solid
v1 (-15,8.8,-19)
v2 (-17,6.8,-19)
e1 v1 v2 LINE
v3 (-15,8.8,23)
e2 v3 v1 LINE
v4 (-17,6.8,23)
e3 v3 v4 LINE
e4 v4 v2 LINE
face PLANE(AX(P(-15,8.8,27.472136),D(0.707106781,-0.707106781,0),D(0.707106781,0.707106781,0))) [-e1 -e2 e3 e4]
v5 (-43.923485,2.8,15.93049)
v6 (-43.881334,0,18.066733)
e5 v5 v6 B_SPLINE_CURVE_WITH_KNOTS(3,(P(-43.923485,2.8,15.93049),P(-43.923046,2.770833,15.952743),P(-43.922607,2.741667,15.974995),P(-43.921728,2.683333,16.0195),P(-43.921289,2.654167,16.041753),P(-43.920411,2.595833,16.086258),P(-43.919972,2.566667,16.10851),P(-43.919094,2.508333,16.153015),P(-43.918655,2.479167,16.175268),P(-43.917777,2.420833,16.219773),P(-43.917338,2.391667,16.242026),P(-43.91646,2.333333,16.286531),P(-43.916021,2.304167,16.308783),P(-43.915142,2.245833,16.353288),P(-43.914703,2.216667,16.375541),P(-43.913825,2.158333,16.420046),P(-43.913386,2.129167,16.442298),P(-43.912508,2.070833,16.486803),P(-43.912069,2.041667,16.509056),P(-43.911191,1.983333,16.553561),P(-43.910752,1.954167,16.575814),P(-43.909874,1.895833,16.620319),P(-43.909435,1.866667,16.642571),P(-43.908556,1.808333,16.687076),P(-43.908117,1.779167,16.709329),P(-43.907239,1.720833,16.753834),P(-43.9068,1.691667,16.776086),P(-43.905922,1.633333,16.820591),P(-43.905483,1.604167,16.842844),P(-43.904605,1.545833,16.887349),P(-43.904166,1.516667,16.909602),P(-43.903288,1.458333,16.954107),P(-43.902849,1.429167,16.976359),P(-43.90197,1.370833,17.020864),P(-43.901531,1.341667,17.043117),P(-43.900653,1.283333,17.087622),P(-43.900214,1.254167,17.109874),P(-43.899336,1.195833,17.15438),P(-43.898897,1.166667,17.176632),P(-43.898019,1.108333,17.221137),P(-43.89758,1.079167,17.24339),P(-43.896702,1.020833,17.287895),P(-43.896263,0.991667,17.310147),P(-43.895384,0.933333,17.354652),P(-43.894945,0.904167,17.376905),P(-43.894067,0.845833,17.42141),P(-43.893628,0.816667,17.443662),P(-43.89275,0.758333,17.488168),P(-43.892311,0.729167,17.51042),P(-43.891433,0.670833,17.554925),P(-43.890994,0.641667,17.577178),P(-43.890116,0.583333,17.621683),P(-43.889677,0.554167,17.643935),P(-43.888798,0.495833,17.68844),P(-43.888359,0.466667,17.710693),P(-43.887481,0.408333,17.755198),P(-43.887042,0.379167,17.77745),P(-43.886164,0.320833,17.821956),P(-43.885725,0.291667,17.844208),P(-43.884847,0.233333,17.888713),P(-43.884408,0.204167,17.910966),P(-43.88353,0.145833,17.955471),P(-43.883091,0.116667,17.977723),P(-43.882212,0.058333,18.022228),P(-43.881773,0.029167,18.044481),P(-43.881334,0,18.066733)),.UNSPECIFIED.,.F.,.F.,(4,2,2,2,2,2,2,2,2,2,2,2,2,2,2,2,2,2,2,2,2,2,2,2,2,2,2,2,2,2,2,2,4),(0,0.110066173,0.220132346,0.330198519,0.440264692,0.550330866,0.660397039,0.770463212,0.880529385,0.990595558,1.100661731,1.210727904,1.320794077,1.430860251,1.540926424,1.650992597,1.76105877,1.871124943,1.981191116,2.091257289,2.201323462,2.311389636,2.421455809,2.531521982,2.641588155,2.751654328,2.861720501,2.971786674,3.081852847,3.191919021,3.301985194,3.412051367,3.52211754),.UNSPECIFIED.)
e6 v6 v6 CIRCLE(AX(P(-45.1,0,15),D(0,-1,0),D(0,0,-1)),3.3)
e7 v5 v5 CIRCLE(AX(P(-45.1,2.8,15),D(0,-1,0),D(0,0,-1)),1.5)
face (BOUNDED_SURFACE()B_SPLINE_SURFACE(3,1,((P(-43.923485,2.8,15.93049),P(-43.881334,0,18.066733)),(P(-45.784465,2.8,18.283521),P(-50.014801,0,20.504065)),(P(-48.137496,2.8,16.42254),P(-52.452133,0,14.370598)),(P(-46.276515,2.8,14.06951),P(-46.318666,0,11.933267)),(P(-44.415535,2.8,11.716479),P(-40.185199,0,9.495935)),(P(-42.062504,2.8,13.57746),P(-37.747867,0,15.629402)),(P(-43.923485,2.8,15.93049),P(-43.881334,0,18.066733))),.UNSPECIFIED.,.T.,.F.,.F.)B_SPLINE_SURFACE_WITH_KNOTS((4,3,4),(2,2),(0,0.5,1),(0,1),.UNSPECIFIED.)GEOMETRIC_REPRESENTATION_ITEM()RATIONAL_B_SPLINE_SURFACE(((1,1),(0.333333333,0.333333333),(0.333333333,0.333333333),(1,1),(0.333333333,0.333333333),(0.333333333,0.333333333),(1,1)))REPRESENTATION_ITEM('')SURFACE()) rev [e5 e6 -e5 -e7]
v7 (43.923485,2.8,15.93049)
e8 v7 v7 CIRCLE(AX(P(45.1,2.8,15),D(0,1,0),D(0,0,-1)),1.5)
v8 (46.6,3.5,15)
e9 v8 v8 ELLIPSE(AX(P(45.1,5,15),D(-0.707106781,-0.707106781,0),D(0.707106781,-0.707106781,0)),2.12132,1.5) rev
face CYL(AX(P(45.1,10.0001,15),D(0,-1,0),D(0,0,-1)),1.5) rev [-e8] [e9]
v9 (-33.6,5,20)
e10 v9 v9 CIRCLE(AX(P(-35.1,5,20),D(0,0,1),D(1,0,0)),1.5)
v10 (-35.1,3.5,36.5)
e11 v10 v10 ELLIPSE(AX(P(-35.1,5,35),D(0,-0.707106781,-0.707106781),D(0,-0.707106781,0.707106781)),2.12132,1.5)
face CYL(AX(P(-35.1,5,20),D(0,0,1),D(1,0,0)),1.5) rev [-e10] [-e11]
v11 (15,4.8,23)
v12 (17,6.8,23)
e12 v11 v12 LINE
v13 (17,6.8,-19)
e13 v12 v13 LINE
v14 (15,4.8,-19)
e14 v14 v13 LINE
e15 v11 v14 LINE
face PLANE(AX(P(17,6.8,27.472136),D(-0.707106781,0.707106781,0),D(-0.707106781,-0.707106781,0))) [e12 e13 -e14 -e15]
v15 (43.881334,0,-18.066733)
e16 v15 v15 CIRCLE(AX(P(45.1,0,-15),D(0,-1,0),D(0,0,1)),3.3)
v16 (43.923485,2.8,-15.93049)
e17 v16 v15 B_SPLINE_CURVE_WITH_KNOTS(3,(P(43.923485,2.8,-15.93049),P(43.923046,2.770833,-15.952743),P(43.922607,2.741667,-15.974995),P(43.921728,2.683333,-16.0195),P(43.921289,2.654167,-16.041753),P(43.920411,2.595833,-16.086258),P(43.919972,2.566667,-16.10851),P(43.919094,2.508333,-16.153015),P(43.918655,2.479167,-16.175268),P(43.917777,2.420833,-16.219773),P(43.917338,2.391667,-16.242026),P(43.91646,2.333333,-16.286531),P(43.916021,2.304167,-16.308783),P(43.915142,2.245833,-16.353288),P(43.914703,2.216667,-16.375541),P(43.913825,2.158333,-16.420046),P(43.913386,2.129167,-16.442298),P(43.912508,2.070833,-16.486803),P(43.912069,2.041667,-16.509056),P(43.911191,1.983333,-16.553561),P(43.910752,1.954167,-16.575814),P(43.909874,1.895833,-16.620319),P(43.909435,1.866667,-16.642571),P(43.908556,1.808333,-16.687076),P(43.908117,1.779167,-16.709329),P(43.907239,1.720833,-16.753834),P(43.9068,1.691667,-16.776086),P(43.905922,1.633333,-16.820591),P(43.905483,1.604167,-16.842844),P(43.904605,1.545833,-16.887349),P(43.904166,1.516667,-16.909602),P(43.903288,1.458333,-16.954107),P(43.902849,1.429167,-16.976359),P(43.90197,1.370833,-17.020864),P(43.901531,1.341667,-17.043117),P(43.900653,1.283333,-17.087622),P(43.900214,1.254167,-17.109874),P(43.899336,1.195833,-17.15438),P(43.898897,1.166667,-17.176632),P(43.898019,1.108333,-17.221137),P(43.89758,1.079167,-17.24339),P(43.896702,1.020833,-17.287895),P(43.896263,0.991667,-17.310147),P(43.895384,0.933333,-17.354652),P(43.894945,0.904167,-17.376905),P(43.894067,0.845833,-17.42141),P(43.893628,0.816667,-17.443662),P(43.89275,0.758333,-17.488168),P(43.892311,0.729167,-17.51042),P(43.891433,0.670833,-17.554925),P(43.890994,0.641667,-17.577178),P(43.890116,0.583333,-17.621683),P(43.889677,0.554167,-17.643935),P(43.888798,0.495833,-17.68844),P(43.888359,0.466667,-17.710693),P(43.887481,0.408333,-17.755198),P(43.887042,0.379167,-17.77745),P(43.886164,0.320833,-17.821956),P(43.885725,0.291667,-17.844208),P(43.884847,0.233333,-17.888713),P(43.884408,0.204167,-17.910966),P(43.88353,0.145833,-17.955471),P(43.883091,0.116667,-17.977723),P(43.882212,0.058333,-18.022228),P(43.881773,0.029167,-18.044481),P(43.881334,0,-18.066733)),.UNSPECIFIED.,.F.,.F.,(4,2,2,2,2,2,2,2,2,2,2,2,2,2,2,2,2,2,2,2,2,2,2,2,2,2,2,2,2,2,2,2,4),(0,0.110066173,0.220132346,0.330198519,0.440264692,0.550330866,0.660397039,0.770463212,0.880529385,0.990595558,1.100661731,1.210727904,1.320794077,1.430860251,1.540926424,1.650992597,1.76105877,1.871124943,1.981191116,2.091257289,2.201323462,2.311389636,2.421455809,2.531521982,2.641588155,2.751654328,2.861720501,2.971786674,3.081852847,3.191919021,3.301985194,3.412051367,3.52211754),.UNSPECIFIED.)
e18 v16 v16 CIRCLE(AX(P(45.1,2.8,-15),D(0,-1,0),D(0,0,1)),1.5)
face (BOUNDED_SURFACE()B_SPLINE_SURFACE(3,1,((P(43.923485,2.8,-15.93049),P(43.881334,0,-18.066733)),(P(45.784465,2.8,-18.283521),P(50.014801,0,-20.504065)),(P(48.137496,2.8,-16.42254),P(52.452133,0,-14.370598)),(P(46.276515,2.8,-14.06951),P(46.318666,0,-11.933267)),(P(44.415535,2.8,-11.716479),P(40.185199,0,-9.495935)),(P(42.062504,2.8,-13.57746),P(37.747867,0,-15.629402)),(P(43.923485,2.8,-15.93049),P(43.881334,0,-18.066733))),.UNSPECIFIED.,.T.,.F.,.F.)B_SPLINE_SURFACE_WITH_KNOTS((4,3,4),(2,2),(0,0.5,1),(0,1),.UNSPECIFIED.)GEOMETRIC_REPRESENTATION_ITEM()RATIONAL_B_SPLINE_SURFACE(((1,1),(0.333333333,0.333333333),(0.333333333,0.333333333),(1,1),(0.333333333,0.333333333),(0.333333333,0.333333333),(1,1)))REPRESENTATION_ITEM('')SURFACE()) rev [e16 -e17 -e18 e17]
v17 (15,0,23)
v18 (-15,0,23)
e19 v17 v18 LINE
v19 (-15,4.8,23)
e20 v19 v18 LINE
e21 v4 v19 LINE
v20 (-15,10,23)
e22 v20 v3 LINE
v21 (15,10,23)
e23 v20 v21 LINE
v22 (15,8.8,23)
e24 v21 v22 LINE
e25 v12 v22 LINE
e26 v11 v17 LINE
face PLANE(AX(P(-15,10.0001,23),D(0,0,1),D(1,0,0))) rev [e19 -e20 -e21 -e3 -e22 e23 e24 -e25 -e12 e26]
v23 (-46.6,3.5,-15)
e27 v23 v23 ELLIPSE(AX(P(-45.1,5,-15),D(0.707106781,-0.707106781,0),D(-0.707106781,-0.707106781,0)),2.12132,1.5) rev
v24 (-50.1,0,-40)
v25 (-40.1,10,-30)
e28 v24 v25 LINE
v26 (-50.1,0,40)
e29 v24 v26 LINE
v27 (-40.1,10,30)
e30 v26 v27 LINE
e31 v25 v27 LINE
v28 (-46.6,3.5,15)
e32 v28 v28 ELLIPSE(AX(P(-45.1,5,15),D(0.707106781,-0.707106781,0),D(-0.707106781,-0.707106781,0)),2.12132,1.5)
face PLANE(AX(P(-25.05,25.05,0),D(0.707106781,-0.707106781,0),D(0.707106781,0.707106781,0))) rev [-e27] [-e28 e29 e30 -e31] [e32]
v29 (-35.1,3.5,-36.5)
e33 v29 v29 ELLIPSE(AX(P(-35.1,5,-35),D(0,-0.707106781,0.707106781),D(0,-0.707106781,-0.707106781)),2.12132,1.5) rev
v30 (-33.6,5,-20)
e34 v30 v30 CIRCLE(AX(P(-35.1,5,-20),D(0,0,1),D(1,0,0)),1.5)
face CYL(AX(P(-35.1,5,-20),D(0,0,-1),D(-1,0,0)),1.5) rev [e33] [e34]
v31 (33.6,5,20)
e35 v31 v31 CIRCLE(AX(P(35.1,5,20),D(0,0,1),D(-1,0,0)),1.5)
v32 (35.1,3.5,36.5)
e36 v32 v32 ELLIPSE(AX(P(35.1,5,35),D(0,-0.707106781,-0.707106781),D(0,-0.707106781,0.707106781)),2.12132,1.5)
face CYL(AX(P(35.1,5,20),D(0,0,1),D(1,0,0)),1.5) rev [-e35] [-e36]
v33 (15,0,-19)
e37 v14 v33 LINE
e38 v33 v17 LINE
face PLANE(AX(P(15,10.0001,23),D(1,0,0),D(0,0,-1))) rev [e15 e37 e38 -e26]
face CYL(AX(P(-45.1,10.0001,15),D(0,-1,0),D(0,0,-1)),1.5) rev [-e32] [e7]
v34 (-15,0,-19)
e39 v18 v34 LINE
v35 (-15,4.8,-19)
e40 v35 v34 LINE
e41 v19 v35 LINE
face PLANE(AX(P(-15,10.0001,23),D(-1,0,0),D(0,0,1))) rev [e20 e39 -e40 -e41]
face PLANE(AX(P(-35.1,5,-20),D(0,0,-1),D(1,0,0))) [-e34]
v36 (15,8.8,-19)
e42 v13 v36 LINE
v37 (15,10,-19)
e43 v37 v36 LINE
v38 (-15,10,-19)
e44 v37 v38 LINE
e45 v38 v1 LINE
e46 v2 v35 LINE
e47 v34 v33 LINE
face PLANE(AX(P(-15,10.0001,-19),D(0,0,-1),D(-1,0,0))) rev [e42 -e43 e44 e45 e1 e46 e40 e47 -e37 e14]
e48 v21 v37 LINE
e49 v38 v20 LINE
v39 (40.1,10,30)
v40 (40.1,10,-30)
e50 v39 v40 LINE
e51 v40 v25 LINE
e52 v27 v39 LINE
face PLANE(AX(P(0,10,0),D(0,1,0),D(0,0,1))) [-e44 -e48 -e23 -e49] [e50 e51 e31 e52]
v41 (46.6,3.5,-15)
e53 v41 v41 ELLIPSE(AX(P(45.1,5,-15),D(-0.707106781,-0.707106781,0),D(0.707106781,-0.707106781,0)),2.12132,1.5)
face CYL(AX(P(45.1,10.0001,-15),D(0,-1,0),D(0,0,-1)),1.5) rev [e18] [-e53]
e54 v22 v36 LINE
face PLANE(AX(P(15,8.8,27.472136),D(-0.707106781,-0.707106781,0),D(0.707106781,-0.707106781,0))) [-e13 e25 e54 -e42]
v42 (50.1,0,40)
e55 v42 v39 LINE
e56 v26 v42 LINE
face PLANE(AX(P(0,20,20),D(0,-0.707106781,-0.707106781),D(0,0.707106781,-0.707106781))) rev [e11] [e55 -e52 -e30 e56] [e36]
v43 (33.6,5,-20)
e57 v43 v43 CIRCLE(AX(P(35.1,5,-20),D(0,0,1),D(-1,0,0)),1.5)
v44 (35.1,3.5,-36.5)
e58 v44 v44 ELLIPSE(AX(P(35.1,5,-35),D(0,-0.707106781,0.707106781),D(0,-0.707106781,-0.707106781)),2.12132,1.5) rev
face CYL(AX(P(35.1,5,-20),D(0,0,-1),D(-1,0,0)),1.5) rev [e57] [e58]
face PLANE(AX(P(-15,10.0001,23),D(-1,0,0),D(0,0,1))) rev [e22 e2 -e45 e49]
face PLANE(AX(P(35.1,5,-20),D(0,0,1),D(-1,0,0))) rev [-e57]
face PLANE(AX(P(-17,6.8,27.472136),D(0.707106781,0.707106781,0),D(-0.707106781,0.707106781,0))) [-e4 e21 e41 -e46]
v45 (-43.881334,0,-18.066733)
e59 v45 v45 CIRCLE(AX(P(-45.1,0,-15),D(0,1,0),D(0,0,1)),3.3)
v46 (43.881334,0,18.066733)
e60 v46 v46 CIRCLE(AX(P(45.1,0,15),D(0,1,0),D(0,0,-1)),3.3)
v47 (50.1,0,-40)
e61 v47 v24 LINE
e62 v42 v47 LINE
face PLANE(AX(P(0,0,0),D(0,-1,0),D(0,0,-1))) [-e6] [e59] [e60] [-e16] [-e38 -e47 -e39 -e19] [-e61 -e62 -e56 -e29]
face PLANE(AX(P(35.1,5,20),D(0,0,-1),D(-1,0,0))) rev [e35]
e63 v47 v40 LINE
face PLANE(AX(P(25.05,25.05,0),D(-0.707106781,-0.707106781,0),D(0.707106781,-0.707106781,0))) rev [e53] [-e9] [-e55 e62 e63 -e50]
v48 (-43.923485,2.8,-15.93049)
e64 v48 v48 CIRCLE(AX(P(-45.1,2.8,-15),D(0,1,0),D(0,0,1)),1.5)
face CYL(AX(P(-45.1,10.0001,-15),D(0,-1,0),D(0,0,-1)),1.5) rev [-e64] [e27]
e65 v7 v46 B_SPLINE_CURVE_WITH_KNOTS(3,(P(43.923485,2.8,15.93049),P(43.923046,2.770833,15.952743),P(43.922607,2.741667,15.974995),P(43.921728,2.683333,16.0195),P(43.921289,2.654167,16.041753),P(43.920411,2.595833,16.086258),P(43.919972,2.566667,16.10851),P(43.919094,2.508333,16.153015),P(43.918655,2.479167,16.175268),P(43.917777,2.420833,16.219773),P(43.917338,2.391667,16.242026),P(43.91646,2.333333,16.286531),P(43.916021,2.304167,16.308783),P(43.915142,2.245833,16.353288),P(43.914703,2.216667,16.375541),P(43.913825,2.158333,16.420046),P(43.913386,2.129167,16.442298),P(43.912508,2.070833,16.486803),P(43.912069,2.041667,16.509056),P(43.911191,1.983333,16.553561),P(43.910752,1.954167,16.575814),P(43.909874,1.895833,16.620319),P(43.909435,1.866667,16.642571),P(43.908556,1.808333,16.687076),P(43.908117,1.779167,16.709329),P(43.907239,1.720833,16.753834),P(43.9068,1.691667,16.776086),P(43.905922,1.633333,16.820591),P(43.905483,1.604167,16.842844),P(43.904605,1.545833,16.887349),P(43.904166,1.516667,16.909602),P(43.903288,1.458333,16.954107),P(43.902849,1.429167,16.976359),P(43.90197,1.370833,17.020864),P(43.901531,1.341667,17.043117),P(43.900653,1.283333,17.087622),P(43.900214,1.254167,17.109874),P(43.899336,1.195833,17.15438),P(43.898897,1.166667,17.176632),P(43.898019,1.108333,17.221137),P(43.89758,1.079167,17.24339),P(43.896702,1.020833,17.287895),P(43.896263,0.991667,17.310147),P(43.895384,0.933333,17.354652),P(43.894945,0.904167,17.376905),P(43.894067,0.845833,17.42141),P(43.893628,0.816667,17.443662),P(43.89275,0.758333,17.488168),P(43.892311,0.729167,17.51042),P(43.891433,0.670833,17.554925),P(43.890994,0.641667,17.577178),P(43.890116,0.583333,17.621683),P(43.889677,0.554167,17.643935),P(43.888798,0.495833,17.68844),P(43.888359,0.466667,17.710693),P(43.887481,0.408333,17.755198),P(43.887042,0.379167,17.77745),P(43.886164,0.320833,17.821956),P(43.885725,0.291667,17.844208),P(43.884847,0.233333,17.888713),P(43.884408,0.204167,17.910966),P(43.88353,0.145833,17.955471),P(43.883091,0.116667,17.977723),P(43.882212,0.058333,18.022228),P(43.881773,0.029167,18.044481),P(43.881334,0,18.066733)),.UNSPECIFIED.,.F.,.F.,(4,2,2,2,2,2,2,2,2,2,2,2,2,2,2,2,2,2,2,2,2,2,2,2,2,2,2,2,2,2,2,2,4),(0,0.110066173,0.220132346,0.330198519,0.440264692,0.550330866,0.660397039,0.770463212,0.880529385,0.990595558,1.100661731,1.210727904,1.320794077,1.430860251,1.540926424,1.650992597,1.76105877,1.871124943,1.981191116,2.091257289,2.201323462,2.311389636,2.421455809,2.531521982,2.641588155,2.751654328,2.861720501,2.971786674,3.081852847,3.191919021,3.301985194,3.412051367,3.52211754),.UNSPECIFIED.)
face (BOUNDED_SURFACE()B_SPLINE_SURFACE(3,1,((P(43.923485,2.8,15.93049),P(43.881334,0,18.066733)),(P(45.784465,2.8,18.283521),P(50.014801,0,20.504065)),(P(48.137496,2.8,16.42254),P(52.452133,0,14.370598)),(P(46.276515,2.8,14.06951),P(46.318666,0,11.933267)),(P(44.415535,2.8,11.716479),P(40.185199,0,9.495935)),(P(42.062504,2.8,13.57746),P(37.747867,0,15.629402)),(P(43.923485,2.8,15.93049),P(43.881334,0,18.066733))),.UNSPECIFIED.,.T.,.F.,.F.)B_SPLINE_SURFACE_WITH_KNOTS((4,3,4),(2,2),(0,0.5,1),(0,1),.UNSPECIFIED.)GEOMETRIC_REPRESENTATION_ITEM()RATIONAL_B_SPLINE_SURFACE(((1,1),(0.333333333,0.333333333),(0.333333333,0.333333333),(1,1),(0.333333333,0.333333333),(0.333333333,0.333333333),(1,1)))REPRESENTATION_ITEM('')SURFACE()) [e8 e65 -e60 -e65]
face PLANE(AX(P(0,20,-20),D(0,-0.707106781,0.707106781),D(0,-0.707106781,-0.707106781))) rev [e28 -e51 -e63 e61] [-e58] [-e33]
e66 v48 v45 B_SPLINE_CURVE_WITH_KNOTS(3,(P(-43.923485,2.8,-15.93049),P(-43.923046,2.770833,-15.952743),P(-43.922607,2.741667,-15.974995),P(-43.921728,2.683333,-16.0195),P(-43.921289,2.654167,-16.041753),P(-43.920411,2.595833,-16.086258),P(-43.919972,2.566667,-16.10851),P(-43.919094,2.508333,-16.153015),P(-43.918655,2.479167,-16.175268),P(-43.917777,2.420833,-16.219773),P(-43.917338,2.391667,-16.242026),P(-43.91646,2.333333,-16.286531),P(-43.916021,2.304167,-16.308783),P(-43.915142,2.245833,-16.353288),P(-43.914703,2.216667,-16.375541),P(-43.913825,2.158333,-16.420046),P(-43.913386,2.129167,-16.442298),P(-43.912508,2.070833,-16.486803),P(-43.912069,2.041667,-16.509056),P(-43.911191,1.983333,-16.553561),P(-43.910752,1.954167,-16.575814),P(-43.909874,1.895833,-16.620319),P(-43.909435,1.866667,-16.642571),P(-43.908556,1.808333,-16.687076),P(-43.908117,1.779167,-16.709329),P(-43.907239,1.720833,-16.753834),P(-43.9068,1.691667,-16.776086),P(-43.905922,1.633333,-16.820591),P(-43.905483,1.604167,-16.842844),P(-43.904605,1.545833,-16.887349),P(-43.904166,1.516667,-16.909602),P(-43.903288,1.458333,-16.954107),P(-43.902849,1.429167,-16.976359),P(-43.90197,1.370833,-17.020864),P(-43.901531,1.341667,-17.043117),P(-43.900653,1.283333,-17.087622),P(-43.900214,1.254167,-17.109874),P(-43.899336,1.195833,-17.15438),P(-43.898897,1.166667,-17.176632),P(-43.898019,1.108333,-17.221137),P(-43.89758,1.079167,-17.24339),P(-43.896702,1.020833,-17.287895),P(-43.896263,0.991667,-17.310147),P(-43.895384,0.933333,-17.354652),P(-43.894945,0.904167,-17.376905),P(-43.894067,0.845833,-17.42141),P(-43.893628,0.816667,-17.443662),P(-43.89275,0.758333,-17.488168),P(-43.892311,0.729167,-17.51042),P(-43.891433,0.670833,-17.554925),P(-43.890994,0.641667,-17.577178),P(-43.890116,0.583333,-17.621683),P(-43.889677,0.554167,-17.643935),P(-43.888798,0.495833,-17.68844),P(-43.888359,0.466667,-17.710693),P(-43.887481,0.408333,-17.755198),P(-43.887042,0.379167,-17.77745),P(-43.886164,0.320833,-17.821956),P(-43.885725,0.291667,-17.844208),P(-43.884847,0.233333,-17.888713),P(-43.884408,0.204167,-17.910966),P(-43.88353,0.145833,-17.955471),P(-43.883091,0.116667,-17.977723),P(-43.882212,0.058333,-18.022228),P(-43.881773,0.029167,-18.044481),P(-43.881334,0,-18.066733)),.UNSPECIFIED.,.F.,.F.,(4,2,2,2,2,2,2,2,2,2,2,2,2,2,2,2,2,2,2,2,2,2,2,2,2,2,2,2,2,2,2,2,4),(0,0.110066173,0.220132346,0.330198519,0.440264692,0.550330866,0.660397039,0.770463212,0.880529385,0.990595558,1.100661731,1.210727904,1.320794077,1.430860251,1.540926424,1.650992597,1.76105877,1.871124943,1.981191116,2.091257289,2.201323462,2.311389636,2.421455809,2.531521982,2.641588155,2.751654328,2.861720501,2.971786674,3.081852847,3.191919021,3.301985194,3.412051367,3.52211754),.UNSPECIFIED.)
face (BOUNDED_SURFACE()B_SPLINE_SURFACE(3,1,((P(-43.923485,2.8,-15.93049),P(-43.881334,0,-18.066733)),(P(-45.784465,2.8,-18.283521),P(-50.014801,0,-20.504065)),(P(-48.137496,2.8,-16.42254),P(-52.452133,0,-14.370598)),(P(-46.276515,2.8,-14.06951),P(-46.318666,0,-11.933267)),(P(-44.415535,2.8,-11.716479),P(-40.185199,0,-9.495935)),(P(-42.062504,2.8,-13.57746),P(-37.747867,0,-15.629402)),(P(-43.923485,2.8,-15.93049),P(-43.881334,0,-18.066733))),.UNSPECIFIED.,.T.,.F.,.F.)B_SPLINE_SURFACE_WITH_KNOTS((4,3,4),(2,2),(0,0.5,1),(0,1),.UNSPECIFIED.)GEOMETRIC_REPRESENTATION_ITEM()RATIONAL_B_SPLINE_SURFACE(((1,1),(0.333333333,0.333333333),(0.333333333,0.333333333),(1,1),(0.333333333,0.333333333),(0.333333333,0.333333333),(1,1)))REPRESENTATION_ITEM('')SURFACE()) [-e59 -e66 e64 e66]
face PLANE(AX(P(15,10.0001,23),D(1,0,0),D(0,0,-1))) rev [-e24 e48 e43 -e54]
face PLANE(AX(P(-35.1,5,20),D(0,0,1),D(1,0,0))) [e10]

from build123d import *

# Parameters (mm, degrees)
SKETCH_4_R          = 1.5
CUT_EXTRUDE_1_DEPTH = 20
SKETCH_5_R          = 1.5
CUT_EXTRUDE_2_DEPTH = 65.884590004
SKETCH3_W           = 30
SKETCH3_H           = 42
CUT_EXTRUDE1_DEPTH  = 65.884590004
CUT_EXTRUDE2_DEPTH  = 42


with BuildPart() as part:
    # Эскиз1 → По сечениям1 section 0
    with BuildSketch(Plane(origin=(0, 0, 0), x_dir=(1, 0, 0), z_dir=(0, 1, 0))):
        with BuildLine():
            Line((-50.1, -40), (50.1, -40))
            Line((50.1, -40), (50.1, 40))
            Line((50.1, 40), (-50.1, 40))
            Line((-50.1, 40), (-50.1, -40))
        make_face()
    # Эскиз2 → По сечениям1 section 1
    with BuildSketch(Plane(origin=(0, 10, 0), x_dir=(1, 0, 0), z_dir=(0, 1, 0))):
        with BuildLine():
            Line((40.1, -30), (40.1, 30))
            Line((40.1, 30), (-40.1, 30))
            Line((-40.1, 30), (-40.1, -30))
            Line((-40.1, -30), (40.1, -30))
        make_face()
    loft()

    # Эскиз4 → Вырез-Вытянуть1 (cut)
    with BuildSketch(Plane.XY.offset(40)):
        with Locations((-35.1, 5)):
            Circle(SKETCH_4_R)
        with Locations(Location((35.1, 5, 0), (0, 0, 270))):
            Circle(SKETCH_4_R)
    cut_extrude_1 = extrude(amount=-CUT_EXTRUDE_1_DEPTH, mode=Mode.SUBTRACT)

    # Зеркальное отражение1: Вырез-Вытянуть1 across plane
    add(cut_extrude_1.mirror(Plane.XY), mode=Mode.SUBTRACT)

    # Эскиз5 → Вырез-Вытянуть2 (cut, through all)
    with BuildSketch(Plane.XZ):
        with Locations(Location((-45.1, 15, 0), (0, 0, 270))):
            Circle(SKETCH_5_R)
        with Locations(Location((-45.1, -15, 0), (0, 0, 180))):
            Circle(SKETCH_5_R)
        with Locations(Location((45.1, -15, 0), (0, 0, 270))):
            Circle(SKETCH_5_R)
        with Locations((45.1, 15)):
            Circle(SKETCH_5_R)
    extrude(amount=-CUT_EXTRUDE_2_DEPTH, mode=Mode.SUBTRACT)

    # Cut-Loft1: read off the stored shape, not the designer's step
    # Cut-Loft1: loft between two sections, ruled curve by curve
    cut_loft1_from = [
        Edge.make_bspline([(-43.923484762, 2.8, 15.930490137), (-45.784465036, 2.8, 18.283520613), (-48.137495512, 2.8, 16.422540339), (-46.276515238, 2.8, 14.069509863), (-44.415534964, 2.8, 11.716479387), (-42.062504488, 2.8, 13.577459661), (-43.923484762, 2.8, 15.930490137)], [0, 0, 0, 0, 0.5, 0.5, 0.5, 1, 1, 1, 1], 3, [1, 0.333333333, 0.333333333, 1, 0.333333333, 0.333333333, 1]),
    ]
    cut_loft1_to = [
        Edge.make_bspline([(-43.881334244, 0, 18.066733405), (-50.014801053, 0, 20.504064917), (-52.452132565, 0, 14.370598107), (-46.318665756, 0, 11.933266595), (-40.185198947, 0, 9.495935083), (-37.747867435, 0, 15.629401893), (-43.881334244, 0, 18.066733405)], [0, 0, 0, 0, 0.5, 0.5, 0.5, 1, 1, 1, 1], 3, [1, 0.333333333, 0.333333333, 1, 0.333333333, 0.333333333, 1]),
    ]
    cut_loft1 = Solid(Shell([*[Face.make_surface_from_curves(cut_loft1_from[k], cut_loft1_to[k]) for k in range(1)], Face(Wire(cut_loft1_from)), Face(Wire(cut_loft1_to))]))
    add(cut_loft1, mode=Mode.SUBTRACT)

    # Mirror1: Cut-Loft1 across plane
    add(cut_loft1.mirror(Plane.XY), mode=Mode.SUBTRACT)

    # Mirror2: read off the stored shape, not the designer's step
    # Mirror2: loft between two sections, ruled curve by curve
    mirror2_from = [
        Edge.make_bspline([(43.923484762, 2.8, 15.930490137), (45.784465036, 2.8, 18.283520613), (48.137495512, 2.8, 16.422540339), (46.276515238, 2.8, 14.069509863), (44.415534964, 2.8, 11.716479387), (42.062504488, 2.8, 13.577459661), (43.923484762, 2.8, 15.930490137)], [0, 0, 0, 0, 0.5, 0.5, 0.5, 1, 1, 1, 1], 3, [1, 0.333333333, 0.333333333, 1, 0.333333333, 0.333333333, 1]),
    ]
    mirror2_to = [
        Edge.make_bspline([(43.881334244, 0, 18.066733405), (50.014801053, 0, 20.504064917), (52.452132565, 0, 14.370598107), (46.318665756, 0, 11.933266595), (40.185198947, 0, 9.495935083), (37.747867435, 0, 15.629401893), (43.881334244, 0, 18.066733405)], [0, 0, 0, 0, 0.5, 0.5, 0.5, 1, 1, 1, 1], 3, [1, 0.333333333, 0.333333333, 1, 0.333333333, 0.333333333, 1]),
    ]
    mirror2 = Solid(Shell([*[Face.make_surface_from_curves(mirror2_from[k], mirror2_to[k]) for k in range(1)], Face(Wire(mirror2_from)), Face(Wire(mirror2_to))]))
    add(mirror2, mode=Mode.SUBTRACT)

    # Mirror2 2: loft between two sections, ruled curve by curve
    mirror2_2_from = [
        Edge.make_bspline([(43.923484762, 2.8, -15.930490137), (45.784465036, 2.8, -18.283520613), (48.137495512, 2.8, -16.422540339), (46.276515238, 2.8, -14.069509863), (44.415534964, 2.8, -11.716479387), (42.062504488, 2.8, -13.577459661), (43.923484762, 2.8, -15.930490137)], [0, 0, 0, 0, 0.5, 0.5, 0.5, 1, 1, 1, 1], 3, [1, 0.333333333, 0.333333333, 1, 0.333333333, 0.333333333, 1]),
    ]
    mirror2_2_to = [
        Edge.make_bspline([(43.881334244, 0, -18.066733405), (50.014801053, 0, -20.504064917), (52.452132565, 0, -14.370598107), (46.318665756, 0, -11.933266595), (40.185198947, 0, -9.495935083), (37.747867435, 0, -15.629401893), (43.881334244, 0, -18.066733405)], [0, 0, 0, 0, 0.5, 0.5, 0.5, 1, 1, 1, 1], 3, [1, 0.333333333, 0.333333333, 1, 0.333333333, 0.333333333, 1]),
    ]
    mirror2_2 = Solid(Shell([*[Face.make_surface_from_curves(mirror2_2_from[k], mirror2_2_to[k]) for k in range(1)], Face(Wire(mirror2_2_from)), Face(Wire(mirror2_2_to))]))
    add(mirror2_2, mode=Mode.SUBTRACT)

    # Sketch3 → Cut-Extrude1 (cut, through all)
    with BuildSketch(Plane.XZ):
        with Locations((0, 2)):
            Rectangle(SKETCH3_W, SKETCH3_H)
    extrude(amount=-CUT_EXTRUDE1_DEPTH, mode=Mode.SUBTRACT)

    # Sketch4 → Cut-Extrude2 (cut)
    with BuildSketch(Plane.XY.offset(-19)):
        Polygon((-15, 8.8), (-17, 6.8), (-15, 4.8), align=None)
        Polygon((15, 4.8), (15, 8.8), (17, 6.8), align=None)
    extrude(amount=CUT_EXTRUDE2_DEPTH, mode=Mode.SUBTRACT)


solid = part.part
